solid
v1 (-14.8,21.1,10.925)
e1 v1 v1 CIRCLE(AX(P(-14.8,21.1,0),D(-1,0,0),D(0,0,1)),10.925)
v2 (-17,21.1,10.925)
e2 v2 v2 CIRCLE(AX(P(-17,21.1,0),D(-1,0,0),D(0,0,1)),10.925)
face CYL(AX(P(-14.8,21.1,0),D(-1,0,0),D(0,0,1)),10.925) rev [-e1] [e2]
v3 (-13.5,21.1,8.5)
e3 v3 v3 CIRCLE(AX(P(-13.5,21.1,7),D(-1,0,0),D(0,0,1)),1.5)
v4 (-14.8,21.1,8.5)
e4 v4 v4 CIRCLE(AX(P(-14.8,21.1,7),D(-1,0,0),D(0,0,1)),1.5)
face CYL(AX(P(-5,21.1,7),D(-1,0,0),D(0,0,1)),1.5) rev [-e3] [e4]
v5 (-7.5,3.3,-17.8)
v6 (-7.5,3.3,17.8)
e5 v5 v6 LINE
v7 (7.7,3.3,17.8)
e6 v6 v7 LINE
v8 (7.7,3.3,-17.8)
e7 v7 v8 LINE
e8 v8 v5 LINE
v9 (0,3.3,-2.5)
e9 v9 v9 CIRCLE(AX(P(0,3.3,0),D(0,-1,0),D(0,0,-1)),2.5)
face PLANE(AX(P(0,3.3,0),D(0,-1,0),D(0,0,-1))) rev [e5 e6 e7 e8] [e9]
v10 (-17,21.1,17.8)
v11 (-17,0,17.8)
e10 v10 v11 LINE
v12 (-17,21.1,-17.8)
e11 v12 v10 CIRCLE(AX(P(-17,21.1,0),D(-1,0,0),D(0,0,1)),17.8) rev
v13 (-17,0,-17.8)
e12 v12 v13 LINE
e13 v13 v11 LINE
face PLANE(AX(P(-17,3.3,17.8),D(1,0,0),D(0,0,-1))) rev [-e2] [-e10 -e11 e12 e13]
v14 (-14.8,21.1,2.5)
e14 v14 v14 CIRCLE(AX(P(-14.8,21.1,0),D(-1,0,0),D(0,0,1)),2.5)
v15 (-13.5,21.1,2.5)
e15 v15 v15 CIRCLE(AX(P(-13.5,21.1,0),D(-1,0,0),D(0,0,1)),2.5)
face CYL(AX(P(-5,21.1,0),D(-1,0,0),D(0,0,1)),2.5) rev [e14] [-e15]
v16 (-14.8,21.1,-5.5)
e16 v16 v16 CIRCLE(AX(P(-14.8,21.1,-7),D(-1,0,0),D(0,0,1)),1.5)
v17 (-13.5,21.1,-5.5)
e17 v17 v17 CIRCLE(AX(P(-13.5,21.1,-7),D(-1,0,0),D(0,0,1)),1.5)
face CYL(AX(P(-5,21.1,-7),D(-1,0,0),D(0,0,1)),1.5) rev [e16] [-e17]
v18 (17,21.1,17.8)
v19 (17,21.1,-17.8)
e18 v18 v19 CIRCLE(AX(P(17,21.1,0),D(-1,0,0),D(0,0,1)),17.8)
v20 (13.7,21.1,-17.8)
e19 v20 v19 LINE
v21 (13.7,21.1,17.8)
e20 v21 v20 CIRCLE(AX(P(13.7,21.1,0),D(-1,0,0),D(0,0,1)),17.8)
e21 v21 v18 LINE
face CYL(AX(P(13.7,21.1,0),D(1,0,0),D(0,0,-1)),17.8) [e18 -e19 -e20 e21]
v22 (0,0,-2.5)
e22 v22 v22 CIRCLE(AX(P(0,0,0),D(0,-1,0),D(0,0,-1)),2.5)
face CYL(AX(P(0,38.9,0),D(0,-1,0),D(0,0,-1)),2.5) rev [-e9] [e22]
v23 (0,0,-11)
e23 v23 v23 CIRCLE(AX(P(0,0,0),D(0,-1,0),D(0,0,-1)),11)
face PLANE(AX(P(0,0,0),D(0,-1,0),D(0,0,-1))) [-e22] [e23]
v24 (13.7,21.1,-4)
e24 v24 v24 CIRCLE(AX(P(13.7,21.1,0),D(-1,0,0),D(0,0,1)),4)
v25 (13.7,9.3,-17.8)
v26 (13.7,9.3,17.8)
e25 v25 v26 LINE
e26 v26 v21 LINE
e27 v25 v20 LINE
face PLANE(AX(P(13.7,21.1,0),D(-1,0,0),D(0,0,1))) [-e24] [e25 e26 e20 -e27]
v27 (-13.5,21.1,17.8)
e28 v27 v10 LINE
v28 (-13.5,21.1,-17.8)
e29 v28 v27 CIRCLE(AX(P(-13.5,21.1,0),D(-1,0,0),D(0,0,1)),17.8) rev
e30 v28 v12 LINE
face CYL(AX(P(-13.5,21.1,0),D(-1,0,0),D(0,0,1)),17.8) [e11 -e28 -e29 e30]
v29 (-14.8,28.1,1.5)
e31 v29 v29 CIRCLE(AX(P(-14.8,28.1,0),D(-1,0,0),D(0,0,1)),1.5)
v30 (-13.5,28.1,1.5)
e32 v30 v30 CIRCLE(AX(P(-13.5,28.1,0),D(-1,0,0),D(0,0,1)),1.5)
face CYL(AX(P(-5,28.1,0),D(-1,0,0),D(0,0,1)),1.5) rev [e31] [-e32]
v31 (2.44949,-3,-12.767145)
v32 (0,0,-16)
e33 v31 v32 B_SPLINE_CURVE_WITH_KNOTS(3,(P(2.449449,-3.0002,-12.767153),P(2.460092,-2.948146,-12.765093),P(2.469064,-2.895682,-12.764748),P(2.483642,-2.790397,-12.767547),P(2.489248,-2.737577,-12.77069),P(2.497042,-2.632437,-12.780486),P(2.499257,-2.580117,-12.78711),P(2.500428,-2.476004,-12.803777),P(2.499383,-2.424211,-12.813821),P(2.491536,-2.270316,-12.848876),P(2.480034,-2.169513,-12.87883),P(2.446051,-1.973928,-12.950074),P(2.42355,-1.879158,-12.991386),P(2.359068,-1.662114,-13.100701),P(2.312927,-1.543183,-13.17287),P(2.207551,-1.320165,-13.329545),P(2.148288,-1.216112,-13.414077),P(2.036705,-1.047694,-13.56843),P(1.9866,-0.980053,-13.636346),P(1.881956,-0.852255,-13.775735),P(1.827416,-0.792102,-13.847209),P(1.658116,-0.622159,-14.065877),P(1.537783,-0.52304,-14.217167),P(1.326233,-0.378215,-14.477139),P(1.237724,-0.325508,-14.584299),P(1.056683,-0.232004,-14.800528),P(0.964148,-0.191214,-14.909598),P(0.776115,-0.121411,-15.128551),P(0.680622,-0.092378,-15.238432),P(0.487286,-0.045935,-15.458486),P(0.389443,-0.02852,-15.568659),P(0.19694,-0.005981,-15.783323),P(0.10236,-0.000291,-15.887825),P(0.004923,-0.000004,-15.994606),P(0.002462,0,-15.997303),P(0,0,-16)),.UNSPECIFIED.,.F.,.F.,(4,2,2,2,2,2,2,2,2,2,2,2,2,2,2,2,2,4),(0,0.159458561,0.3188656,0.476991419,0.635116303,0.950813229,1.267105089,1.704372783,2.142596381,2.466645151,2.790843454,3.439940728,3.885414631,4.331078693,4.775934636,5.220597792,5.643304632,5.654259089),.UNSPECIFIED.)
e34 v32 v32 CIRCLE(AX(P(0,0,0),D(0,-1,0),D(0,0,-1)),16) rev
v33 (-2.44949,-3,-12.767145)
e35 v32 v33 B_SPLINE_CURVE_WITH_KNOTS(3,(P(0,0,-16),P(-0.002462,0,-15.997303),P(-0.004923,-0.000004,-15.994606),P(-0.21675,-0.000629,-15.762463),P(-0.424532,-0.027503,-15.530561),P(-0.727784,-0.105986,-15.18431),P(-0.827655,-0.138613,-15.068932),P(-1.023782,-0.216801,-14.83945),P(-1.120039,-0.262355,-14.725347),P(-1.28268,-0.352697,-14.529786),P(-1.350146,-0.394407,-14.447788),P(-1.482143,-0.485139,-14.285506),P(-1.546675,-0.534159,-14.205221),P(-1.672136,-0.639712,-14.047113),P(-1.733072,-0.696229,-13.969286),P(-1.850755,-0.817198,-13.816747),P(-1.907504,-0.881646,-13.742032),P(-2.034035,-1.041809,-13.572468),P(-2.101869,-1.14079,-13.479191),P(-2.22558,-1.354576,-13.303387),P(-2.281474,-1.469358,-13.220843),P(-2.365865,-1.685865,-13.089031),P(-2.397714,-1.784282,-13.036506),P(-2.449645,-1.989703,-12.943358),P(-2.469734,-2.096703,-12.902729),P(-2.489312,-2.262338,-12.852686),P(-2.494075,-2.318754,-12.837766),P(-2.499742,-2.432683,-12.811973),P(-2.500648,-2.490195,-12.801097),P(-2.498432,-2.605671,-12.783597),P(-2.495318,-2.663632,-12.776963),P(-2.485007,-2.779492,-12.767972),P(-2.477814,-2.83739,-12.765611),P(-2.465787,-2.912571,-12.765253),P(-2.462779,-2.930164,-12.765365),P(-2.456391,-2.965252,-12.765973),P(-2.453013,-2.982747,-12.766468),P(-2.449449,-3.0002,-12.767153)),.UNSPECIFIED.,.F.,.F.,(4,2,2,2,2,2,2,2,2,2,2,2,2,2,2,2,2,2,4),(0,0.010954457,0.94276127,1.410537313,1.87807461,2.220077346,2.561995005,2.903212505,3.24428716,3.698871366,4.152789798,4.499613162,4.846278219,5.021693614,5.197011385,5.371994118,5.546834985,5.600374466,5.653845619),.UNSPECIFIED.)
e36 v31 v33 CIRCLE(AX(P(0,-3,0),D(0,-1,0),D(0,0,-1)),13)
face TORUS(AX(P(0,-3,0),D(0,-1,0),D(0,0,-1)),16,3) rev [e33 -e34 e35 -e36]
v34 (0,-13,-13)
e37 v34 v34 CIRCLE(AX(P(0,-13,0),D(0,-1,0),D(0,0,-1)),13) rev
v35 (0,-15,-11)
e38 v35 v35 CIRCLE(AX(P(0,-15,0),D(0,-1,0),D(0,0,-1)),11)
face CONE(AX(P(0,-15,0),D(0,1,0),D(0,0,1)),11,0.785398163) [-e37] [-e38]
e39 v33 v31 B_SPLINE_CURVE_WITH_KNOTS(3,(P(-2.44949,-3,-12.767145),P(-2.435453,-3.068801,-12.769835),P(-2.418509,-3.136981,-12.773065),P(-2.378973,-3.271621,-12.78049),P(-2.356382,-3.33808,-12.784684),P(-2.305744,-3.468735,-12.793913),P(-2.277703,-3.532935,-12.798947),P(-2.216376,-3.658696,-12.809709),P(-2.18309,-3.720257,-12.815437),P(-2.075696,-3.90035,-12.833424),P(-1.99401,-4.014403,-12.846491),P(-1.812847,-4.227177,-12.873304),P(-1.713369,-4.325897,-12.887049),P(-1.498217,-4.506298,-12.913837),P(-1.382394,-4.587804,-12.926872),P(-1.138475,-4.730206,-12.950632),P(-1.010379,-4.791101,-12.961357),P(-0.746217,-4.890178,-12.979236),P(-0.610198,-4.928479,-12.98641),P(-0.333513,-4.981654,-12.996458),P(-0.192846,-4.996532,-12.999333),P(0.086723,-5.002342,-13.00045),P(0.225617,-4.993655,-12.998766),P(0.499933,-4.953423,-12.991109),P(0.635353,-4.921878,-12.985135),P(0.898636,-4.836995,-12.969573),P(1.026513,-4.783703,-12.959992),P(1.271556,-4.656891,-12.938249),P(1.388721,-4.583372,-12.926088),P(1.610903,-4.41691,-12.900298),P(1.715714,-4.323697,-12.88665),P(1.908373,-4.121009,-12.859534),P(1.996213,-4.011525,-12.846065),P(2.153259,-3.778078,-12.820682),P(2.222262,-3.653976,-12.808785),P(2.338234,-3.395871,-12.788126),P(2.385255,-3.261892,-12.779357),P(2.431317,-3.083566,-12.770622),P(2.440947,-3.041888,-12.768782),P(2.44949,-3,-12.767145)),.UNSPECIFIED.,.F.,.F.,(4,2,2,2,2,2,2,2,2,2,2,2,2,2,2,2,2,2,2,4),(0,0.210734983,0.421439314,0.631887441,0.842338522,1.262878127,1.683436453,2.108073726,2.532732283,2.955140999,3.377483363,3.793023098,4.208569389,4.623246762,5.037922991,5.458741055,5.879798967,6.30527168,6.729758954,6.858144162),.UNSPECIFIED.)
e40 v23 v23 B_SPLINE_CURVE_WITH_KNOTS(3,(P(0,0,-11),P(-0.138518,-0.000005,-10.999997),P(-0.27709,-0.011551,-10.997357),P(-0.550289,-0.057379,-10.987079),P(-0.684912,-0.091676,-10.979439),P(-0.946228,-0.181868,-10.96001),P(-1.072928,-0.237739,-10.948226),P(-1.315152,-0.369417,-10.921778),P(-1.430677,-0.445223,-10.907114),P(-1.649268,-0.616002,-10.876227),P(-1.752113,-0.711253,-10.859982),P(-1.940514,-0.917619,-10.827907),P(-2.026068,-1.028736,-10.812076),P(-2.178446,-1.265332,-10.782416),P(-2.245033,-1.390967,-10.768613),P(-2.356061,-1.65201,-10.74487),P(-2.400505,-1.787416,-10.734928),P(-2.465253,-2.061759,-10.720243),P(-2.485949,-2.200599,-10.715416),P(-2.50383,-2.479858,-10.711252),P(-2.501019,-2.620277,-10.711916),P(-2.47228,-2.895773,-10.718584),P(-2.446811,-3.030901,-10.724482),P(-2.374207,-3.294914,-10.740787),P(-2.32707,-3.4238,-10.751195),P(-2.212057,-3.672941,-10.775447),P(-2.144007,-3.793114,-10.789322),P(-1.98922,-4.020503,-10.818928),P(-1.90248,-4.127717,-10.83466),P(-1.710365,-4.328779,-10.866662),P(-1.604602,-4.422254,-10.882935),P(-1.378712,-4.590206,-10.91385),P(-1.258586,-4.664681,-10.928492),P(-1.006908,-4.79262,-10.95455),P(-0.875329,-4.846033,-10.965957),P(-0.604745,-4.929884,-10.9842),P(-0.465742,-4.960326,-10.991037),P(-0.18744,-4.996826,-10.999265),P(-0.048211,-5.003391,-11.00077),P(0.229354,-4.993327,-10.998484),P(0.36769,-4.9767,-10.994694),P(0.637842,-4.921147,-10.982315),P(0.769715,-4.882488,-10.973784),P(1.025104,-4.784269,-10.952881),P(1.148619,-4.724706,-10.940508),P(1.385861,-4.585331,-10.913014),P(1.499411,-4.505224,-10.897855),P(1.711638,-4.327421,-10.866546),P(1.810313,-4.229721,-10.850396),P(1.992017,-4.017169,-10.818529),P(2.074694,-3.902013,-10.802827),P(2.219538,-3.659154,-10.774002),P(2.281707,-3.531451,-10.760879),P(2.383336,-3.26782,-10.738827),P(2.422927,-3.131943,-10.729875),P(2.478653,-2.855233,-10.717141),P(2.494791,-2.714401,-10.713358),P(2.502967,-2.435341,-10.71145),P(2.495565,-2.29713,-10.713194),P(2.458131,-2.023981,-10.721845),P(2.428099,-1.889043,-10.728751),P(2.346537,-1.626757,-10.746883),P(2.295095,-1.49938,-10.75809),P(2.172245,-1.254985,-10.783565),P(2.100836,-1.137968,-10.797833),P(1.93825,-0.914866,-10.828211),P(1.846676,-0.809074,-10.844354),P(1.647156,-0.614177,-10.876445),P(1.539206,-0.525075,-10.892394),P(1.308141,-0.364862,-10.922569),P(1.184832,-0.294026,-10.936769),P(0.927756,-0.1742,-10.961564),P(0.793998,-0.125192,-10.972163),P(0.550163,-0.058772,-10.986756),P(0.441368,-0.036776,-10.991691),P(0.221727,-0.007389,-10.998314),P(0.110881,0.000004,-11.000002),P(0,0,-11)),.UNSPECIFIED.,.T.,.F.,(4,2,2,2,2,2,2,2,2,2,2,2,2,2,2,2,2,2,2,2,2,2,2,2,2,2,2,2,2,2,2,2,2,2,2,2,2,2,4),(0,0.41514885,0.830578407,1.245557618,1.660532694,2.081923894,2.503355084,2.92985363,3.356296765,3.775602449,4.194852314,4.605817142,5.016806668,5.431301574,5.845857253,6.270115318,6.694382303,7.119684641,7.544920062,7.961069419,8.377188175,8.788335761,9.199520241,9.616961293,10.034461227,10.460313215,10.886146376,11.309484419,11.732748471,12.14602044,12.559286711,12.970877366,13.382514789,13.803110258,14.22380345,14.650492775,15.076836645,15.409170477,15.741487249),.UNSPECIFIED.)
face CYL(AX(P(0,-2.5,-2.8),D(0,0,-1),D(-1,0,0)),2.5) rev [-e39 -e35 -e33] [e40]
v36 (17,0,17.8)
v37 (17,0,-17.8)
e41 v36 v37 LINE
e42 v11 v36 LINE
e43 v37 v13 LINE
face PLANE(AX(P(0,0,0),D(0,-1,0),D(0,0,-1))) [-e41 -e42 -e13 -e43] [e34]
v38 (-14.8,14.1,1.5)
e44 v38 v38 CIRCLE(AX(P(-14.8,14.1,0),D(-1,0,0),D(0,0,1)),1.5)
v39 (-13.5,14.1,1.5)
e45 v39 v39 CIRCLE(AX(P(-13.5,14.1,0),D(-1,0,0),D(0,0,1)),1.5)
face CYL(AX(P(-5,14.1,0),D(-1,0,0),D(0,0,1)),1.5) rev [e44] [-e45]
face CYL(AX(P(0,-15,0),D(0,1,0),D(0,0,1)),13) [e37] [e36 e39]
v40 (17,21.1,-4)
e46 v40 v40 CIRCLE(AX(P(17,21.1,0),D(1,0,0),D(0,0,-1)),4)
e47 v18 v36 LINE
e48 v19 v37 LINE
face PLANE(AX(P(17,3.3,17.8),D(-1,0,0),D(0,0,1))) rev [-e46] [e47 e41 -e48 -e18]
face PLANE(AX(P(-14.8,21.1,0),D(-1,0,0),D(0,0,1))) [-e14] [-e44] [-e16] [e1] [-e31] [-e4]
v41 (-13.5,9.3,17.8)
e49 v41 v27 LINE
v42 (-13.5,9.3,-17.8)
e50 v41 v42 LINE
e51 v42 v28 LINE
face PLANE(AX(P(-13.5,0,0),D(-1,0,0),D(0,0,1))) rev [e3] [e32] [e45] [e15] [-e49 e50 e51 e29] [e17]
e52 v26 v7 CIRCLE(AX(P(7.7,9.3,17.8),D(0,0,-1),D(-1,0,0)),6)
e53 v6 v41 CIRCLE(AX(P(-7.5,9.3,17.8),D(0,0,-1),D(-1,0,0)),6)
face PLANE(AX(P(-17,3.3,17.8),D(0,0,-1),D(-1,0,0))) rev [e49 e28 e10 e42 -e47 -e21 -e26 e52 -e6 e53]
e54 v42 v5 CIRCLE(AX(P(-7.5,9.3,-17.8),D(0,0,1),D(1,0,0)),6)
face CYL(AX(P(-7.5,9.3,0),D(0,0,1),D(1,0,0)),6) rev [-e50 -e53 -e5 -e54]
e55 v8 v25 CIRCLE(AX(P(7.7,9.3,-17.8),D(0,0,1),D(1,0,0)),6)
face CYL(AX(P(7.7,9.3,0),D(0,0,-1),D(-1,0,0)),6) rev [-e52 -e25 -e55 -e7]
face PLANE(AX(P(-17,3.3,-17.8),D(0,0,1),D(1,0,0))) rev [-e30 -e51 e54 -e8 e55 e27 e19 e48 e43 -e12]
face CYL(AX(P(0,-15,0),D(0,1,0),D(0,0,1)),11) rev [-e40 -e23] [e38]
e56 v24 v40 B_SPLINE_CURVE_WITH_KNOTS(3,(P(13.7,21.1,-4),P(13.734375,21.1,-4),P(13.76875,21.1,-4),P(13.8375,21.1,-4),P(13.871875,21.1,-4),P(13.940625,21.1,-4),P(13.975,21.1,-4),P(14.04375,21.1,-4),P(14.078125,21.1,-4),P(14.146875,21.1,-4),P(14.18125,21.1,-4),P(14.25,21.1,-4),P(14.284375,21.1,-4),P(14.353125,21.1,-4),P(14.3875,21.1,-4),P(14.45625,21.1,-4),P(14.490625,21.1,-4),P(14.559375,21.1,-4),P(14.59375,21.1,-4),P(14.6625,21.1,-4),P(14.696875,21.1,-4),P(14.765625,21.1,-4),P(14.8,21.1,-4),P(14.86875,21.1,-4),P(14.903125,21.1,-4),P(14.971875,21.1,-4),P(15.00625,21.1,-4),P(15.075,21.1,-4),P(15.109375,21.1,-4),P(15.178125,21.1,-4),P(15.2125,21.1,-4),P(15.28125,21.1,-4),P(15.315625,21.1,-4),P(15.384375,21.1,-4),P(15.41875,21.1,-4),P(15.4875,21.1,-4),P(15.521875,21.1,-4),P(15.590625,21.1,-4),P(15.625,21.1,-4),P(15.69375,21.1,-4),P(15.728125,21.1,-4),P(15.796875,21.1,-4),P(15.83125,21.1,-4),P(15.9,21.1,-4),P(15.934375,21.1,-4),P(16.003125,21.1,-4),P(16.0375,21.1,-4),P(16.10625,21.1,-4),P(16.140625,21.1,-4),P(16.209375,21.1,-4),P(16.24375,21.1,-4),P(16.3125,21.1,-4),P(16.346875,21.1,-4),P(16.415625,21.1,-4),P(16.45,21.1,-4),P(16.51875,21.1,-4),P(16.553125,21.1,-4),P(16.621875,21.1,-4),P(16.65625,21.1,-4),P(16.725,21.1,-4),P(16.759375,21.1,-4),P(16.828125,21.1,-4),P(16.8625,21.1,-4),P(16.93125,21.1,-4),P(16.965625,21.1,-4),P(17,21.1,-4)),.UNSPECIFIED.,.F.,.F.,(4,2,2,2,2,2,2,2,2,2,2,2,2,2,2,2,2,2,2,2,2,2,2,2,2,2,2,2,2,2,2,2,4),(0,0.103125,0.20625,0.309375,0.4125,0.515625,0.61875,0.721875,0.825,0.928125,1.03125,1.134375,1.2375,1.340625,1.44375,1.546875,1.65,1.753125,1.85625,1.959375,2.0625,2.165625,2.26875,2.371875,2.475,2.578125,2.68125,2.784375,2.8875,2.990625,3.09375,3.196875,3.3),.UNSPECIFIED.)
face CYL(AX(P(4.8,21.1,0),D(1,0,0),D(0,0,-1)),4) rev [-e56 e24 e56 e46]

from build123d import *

# Parameters (mm, degrees)
SKETCH1_W               = 34
SKETCH1_H               = 35.6
BOSS_EXTRUDE1_DEPTH     = 3.3
BOSS_EXTRUDE2_DEPTH     = 3.5
BOSS_EXTRUDE3_START     = -30.7
BOSS_EXTRUDE3_DEPTH     = 3.3
SKETCH4_R               = 2.5
SKETCH4_R_2             = 1.5
CUT_EXTRUDE1_DEPTH      = 12
SKETCH4_3_R             = 10.925
SKETCH4_3_R_2           = 1.5
SKETCH4_3_R_3           = 2.5
CUT_EXTRUDE2_DEPTH      = 2.2
SKETCH5_R               = 4
CUT_EXTRUDE3_DEPTH      = 12.2
CUT_EXTRUDE4_DEPTH      = 47.033140236
CUT_EXTRUDE4_DEPTH_BACK = 47.033140236
SKETCH6_R               = 2.5
FILLET1_R               = 6
SKETCH7_R               = 13
SKETCH7_R_2             = 11
BOSS_EXTRUDE4_DEPTH     = 15
CHAMFER1_SIZE           = 2
FILLET2_R               = 3
SKETCH9_R               = 2.5
CUT_EXTRUDE5_DEPTH      = 15


with BuildPart() as part:
    # Sketch1 → Boss-Extrude1 (new body)
    with BuildSketch(Plane(origin=(0, 0, 0), x_dir=(1, 0, 0), z_dir=(0, 1, 0))):
        Rectangle(SKETCH1_W, SKETCH1_H)
    extrude(amount=BOSS_EXTRUDE1_DEPTH)

    # Sketch3 → Boss-Extrude2 (add)
    with BuildSketch(Plane.ZY.offset(17)):
        with BuildLine():
            Line((0, 38.9), (0, 3.3))
            Line((0, 3.3), (17.8, 3.3))
            Line((17.8, 3.3), (17.8, 21.1))
            ThreePointArc((17.8, 21.1), (12.586500705, 33.686500705), (0, 38.9))
        make_face()
        with BuildLine():
            Line((-17.8, 3.3), (0, 3.3))
            Line((0, 3.3), (0, 38.9))
            ThreePointArc((0, 38.9), (-12.586500705, 33.686500705), (-17.8, 21.1))
            Line((-17.8, 21.1), (-17.8, 3.3))
        make_face()
    extrude(amount=-BOSS_EXTRUDE2_DEPTH)

    # Sketch3<4> → Boss-Extrude3 (add)
    with BuildSketch(Plane.ZY.offset(17).offset(BOSS_EXTRUDE3_START)):
        with BuildLine():
            Line((-17.8, 3.3), (0, 3.3))
            Line((0, 3.3), (0, 38.9))
            ThreePointArc((0, 38.9), (-12.586500705, 33.686500705), (-17.8, 21.1))
            Line((-17.8, 21.1), (-17.8, 3.3))
        make_face()
        with BuildLine():
            Line((0, 38.9), (0, 3.3))
            Line((0, 3.3), (17.8, 3.3))
            Line((17.8, 3.3), (17.8, 21.1))
            ThreePointArc((17.8, 21.1), (12.586500705, 33.686500705), (0, 38.9))
        make_face()
    extrude(amount=-BOSS_EXTRUDE3_DEPTH)

    # Sketch4 → Cut-Extrude1 (cut)
    with BuildSketch(Plane.ZY.offset(17)):
        with Locations((0, 21.1)):
            Circle(SKETCH4_R)
        with Locations((7, 21.1)):
            Circle(SKETCH4_R_2)
        with Locations((0, 28.1)):
            Circle(SKETCH4_R_2)
        with Locations((-7, 21.1)):
            Circle(SKETCH4_R_2)
        with Locations((0, 14.1)):
            Circle(SKETCH4_R_2)
    extrude(amount=-CUT_EXTRUDE1_DEPTH, mode=Mode.SUBTRACT)

    # Sketch4<3> → Cut-Extrude2 (cut)
    with BuildSketch(Plane.ZY.offset(17)):
        with Locations((0, 21.1)):
            Circle(SKETCH4_3_R)
        with Locations((0, 28.1)):
            Circle(SKETCH4_3_R_2, mode=Mode.SUBTRACT)
        with Locations((0, 14.1)):
            Circle(SKETCH4_3_R_2, mode=Mode.SUBTRACT)
        with Locations((-7, 21.1)):
            Circle(SKETCH4_3_R_2, mode=Mode.SUBTRACT)
        with Locations((7, 21.1)):
            Circle(SKETCH4_3_R_2, mode=Mode.SUBTRACT)
        with Locations((0, 21.1)):
            Circle(SKETCH4_3_R_3, mode=Mode.SUBTRACT)
    extrude(amount=-CUT_EXTRUDE2_DEPTH, mode=Mode.SUBTRACT)

    # Sketch5 → Cut-Extrude3 (cut)
    with BuildSketch(Plane(origin=(17, 0, 0), x_dir=(0, 0, -1), z_dir=(1, 0, 0))):
        with Locations((0, 21.1)):
            Circle(SKETCH5_R)
    extrude(amount=-CUT_EXTRUDE3_DEPTH, mode=Mode.SUBTRACT)

    # Sketch6 → Cut-Extrude4 (cut, two sides: drawn at the far end of the back side and taken through both)
    with BuildSketch(Plane.XZ.offset(-CUT_EXTRUDE4_DEPTH_BACK)):
        with Locations(Location((0, 0, 0), (0, 0, 270))):
            Circle(SKETCH6_R)
    extrude(amount=CUT_EXTRUDE4_DEPTH + CUT_EXTRUDE4_DEPTH_BACK, mode=Mode.SUBTRACT)

    # Fillet1
    fillet1_edges = [part.edges().sort_by_distance(p)[0] for p in [
        (-13.5, 3.3, 0),
        (13.7, 3.3, 0),
    ]]
    fillet(fillet1_edges, radius=FILLET1_R)

    # Sketch7 → Boss-Extrude4 (add)
    with BuildSketch(Plane.XZ):
        with Locations(Location((0, 0, 0), (0, 0, 270))):
            Circle(SKETCH7_R)
        with Locations(Location((0, 0, 0), (0, 0, 270))):
            Circle(SKETCH7_R_2, mode=Mode.SUBTRACT)
    extrude(amount=BOSS_EXTRUDE4_DEPTH)

    # Chamfer1
    chamfer1_edges = [part.edges().sort_by_distance(p)[0] for p in [
        (0, -15, 13),
    ]]
    chamfer(chamfer1_edges, length=CHAMFER1_SIZE - 0.0001)  # a hair under: the kernel refuses the full size

    # Fillet2
    fillet2_edges = [part.edges().sort_by_distance(p)[0] for p in [
        (0, 0, 13),
    ]]
    fillet(fillet2_edges, radius=FILLET2_R)

    # Sketch9 → Cut-Extrude5 (cut)
    with BuildSketch(Plane(origin=(0, 0, -17.8), x_dir=(-1, 0, 0), z_dir=(0, 0, -1))):
        with Locations(Location((0, -2.5, 0), (0, 0, 90))):
            Circle(SKETCH9_R)
    extrude(amount=-CUT_EXTRUDE5_DEPTH, mode=Mode.SUBTRACT)


solid = part.part
